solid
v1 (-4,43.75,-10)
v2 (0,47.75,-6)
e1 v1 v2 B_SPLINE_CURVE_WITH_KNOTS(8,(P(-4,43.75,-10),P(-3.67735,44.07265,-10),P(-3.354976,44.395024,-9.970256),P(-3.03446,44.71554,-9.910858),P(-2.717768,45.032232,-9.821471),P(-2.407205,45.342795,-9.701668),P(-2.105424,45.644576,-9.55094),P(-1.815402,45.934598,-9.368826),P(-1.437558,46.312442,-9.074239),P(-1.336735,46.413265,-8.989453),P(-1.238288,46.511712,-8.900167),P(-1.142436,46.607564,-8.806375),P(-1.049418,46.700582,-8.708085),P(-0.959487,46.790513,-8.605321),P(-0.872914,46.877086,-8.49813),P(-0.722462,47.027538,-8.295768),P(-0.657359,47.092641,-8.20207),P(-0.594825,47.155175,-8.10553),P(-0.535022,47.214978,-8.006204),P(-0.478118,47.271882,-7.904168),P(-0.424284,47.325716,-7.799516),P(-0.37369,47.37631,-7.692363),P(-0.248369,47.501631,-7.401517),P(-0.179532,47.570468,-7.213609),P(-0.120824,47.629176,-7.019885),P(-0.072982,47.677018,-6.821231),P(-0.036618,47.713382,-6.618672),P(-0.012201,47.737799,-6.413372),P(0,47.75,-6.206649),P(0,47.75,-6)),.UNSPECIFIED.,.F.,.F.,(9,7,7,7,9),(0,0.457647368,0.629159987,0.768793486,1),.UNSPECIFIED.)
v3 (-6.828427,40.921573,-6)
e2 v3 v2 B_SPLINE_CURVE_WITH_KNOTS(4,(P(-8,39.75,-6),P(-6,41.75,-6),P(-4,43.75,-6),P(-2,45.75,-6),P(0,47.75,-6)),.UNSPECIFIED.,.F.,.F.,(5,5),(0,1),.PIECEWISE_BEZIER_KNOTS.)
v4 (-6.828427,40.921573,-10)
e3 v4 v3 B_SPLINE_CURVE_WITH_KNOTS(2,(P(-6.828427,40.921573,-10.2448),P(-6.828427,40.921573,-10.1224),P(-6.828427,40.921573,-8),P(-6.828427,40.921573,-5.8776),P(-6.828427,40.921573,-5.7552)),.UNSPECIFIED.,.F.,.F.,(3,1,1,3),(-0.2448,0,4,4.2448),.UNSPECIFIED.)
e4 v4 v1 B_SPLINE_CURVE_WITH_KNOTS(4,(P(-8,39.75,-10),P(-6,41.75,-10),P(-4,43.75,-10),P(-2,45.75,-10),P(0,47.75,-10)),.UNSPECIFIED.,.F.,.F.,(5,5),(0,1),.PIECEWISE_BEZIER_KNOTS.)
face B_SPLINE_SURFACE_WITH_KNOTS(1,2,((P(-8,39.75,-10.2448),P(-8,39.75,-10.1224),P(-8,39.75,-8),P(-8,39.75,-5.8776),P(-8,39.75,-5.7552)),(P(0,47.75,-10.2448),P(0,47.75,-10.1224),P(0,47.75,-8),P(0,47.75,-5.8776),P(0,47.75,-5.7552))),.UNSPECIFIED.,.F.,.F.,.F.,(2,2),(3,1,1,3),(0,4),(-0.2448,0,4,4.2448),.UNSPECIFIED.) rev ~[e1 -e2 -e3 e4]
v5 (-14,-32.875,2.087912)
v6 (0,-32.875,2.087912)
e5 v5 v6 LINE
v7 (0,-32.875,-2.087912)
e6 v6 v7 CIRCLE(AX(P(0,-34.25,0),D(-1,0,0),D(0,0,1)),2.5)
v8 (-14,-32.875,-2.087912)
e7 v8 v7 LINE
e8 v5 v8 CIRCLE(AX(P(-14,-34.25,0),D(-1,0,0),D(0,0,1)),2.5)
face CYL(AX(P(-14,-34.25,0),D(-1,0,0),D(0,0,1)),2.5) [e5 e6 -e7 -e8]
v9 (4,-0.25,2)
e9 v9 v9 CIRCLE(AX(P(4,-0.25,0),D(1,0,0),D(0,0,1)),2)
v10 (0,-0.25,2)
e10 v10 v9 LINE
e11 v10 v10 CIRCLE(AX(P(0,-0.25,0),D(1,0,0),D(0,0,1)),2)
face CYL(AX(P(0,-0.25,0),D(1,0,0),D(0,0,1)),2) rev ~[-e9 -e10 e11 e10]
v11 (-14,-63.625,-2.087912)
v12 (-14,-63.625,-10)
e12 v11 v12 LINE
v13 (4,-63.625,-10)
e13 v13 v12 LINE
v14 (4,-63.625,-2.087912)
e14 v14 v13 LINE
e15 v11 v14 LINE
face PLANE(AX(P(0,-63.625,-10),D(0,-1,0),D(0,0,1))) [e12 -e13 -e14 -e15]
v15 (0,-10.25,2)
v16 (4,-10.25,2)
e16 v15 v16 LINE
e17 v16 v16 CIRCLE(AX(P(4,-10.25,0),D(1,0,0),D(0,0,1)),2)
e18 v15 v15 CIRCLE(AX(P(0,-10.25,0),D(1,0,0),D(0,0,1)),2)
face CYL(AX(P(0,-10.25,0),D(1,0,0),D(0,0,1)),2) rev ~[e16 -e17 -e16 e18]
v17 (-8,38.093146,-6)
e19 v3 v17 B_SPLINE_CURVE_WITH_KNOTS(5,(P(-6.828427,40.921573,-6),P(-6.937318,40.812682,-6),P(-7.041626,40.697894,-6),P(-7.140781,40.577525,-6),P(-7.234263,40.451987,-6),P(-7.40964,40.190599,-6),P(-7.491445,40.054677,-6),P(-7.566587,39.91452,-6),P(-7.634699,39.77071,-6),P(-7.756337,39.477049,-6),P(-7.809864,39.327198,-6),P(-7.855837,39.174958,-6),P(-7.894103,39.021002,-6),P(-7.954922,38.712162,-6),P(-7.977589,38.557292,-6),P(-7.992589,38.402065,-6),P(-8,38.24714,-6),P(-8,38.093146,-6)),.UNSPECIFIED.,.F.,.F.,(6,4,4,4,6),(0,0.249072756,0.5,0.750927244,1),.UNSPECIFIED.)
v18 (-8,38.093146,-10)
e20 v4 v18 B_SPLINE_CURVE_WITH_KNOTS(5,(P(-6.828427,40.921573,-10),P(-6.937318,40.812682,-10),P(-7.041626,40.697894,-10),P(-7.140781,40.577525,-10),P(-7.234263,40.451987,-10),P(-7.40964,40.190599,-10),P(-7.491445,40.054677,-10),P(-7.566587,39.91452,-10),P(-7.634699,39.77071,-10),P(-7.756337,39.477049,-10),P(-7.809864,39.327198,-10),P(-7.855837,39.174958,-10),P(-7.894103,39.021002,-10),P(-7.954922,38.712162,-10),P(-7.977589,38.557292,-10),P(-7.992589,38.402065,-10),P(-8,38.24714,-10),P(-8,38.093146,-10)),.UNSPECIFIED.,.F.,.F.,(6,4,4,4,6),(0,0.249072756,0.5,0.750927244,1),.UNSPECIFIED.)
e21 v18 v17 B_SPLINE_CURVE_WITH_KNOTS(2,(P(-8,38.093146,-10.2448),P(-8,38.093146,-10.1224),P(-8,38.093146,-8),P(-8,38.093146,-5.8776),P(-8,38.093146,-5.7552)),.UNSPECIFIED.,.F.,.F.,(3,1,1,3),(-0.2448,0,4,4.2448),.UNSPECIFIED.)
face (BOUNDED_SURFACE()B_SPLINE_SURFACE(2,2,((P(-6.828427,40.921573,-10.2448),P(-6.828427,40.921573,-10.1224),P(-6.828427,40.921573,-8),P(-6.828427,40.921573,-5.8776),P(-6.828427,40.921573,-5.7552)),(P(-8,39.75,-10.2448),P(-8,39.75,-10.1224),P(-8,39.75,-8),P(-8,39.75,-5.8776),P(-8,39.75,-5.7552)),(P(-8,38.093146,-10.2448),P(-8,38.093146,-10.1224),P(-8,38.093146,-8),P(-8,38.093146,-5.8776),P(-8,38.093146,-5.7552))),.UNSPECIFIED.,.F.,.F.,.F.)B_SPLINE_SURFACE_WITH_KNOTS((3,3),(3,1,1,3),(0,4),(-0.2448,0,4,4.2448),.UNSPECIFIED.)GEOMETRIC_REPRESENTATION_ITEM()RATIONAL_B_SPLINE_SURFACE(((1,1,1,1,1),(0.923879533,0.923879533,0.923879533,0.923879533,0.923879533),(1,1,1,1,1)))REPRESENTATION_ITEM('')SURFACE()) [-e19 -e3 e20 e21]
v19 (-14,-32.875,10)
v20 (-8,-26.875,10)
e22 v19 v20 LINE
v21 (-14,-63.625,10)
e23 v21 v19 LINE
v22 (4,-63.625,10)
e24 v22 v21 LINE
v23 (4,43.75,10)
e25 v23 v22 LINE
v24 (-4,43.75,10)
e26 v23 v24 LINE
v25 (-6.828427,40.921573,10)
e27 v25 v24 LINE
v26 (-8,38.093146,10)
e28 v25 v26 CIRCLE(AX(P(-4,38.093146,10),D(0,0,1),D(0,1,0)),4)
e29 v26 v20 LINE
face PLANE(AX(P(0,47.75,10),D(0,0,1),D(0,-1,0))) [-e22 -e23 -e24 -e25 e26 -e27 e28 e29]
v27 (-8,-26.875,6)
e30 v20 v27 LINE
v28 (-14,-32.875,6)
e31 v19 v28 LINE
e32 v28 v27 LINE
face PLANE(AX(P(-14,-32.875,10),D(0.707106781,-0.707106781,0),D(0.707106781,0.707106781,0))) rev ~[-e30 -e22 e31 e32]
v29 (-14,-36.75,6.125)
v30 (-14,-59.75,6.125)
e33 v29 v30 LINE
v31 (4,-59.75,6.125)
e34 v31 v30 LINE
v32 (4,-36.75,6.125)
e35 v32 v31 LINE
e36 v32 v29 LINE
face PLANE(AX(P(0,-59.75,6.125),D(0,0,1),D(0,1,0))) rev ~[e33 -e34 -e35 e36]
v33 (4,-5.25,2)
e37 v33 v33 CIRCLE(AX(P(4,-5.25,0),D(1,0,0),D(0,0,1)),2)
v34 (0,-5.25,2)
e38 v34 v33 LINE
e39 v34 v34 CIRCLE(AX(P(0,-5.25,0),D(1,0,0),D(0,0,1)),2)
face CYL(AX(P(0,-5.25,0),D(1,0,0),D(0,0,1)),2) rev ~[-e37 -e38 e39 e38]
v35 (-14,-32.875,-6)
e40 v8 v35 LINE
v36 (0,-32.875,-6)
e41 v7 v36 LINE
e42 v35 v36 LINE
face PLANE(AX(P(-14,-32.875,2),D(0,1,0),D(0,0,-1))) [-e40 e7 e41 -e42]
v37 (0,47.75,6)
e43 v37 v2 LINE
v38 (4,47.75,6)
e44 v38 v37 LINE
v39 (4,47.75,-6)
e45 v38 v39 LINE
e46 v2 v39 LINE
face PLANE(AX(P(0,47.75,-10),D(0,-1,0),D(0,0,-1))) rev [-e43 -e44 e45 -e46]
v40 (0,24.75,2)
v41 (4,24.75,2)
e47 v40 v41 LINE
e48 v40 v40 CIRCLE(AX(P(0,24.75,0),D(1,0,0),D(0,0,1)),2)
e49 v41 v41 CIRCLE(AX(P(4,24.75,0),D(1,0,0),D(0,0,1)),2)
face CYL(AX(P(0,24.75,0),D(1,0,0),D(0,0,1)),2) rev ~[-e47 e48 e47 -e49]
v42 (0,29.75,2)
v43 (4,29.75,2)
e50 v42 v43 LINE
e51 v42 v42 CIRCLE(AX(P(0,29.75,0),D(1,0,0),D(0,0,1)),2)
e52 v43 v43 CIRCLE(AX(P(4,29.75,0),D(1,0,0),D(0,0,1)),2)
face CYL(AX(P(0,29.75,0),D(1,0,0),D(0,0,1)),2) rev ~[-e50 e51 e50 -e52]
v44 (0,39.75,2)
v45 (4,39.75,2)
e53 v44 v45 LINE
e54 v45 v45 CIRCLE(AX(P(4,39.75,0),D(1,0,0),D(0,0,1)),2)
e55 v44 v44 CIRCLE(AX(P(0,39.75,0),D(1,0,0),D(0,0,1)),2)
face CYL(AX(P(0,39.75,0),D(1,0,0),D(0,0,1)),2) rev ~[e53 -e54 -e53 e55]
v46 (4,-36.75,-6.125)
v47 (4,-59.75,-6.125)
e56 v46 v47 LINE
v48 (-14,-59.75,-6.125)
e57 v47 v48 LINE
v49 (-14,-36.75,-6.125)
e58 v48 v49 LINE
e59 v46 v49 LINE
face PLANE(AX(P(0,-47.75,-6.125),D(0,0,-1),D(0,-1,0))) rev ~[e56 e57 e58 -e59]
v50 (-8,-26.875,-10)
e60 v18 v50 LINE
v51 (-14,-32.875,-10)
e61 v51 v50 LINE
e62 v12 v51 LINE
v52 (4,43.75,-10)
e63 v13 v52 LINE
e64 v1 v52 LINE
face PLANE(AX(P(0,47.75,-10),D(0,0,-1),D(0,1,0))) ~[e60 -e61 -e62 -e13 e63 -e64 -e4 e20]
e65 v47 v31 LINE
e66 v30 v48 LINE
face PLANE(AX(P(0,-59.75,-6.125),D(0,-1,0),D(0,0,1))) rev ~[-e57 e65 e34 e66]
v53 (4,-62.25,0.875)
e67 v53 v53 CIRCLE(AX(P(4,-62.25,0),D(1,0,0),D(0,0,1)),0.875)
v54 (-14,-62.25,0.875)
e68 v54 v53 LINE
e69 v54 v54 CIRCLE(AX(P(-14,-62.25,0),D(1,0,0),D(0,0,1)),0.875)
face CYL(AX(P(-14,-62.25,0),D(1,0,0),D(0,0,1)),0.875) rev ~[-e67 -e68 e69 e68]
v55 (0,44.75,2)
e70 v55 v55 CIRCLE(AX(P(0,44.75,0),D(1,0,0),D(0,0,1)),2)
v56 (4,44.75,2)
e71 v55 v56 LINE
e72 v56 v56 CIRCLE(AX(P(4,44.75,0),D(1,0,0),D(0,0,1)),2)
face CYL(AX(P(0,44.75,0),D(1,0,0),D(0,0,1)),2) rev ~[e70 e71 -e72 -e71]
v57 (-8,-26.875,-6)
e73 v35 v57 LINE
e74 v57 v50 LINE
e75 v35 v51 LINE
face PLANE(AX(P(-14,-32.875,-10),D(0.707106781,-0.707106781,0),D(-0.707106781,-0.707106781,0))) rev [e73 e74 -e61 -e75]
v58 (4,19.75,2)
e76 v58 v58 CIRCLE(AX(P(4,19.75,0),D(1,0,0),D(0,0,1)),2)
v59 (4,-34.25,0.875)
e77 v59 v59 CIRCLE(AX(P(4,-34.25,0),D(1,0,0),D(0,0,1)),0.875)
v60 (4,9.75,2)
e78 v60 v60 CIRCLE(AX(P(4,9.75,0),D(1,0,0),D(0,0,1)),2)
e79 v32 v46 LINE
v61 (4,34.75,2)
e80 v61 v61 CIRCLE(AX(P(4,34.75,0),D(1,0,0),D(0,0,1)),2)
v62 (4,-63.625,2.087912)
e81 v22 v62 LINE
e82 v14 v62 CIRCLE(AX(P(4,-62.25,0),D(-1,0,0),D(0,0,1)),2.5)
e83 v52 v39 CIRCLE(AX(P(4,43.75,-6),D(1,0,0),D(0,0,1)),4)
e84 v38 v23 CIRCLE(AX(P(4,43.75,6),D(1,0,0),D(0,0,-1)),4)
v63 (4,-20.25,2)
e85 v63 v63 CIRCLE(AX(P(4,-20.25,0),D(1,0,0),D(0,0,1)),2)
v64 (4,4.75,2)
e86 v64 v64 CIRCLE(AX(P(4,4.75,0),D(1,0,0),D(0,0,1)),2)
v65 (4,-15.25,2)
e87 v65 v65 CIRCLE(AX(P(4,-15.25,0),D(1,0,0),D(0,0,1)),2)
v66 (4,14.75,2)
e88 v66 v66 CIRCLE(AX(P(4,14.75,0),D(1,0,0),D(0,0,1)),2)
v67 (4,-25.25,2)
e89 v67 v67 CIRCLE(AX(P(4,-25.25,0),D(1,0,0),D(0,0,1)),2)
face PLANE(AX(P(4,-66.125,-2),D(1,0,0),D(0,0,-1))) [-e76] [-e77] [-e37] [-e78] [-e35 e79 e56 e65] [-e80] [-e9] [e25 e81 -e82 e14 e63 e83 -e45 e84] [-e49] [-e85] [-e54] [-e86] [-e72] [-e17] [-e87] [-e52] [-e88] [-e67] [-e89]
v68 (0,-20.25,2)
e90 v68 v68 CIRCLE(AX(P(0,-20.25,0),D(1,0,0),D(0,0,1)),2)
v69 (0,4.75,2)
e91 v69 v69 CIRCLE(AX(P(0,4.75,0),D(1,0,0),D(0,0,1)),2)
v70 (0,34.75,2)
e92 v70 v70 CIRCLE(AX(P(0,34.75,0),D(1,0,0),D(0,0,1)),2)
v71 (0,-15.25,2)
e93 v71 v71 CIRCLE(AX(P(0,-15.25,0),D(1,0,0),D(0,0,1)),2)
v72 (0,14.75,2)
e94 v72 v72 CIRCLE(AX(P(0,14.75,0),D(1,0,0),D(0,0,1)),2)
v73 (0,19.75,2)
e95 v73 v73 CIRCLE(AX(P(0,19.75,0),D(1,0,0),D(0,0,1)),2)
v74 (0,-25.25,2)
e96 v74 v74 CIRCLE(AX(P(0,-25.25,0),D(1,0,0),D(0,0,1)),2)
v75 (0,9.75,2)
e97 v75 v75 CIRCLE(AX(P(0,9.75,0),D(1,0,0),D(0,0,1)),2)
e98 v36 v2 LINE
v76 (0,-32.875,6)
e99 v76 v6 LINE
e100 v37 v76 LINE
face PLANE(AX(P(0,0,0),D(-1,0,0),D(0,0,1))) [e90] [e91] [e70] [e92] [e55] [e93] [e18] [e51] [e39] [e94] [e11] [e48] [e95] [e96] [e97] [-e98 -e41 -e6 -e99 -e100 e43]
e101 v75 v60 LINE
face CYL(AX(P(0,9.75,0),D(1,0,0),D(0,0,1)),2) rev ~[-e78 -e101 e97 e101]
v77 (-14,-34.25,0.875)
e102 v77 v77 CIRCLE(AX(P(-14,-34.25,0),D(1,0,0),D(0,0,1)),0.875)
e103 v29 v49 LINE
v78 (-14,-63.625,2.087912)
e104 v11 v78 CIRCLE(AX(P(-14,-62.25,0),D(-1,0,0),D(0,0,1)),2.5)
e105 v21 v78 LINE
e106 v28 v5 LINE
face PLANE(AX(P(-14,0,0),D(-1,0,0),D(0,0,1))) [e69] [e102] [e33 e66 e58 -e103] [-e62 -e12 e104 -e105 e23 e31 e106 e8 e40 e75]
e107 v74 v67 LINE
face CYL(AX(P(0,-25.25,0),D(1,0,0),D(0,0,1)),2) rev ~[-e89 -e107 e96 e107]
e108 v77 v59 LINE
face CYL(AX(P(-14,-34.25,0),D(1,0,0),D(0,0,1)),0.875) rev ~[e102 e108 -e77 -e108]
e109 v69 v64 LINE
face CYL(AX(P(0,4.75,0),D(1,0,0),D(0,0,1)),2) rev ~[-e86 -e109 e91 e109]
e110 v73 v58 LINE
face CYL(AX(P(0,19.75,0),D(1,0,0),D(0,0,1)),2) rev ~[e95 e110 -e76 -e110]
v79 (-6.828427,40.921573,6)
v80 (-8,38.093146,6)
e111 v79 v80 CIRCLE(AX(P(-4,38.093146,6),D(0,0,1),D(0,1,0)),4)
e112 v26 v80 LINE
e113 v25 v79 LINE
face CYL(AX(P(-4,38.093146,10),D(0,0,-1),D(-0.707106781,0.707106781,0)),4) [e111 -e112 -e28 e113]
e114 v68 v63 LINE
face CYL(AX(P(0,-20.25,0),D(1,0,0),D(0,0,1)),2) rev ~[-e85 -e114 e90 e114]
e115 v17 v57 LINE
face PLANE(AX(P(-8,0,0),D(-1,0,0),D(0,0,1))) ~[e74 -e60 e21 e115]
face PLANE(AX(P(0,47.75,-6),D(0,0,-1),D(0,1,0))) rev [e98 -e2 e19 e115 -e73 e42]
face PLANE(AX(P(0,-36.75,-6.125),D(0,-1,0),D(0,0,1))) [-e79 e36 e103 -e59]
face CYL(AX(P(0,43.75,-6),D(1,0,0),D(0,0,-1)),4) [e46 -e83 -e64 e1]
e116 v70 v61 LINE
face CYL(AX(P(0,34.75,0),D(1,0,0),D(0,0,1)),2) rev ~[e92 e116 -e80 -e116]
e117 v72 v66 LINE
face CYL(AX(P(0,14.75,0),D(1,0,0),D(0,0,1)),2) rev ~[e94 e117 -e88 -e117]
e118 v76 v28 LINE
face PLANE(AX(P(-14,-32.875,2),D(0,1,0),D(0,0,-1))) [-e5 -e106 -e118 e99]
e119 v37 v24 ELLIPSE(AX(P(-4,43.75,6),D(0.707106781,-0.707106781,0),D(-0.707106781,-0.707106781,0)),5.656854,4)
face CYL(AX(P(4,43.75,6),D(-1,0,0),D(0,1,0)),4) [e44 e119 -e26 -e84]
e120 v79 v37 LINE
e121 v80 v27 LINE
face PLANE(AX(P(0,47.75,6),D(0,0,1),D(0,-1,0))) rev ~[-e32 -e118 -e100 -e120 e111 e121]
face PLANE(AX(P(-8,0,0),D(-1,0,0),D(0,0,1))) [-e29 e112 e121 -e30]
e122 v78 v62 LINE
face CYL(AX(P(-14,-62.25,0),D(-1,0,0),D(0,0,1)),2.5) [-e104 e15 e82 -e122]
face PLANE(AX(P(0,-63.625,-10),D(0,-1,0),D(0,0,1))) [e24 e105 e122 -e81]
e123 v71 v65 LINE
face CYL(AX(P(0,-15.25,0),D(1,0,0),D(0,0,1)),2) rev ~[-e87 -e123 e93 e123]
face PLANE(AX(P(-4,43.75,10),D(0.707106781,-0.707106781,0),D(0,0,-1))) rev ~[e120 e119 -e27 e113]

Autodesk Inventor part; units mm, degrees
ref_plane "YZ Plane" through (0, 0, 0) normal (1, 0, 0) x (0, 1, 0)
ref_plane "XZ Plane" through (0, 0, 0) normal (0, 1, 0) x (-1, 0, 0)
ref_plane "XY Plane" through (0, 0, 0) normal (0, 0, 1) x (1, 0, 0)
sketch "Sketch1" plane through (0, 0, 0) normal (1, 0, 0) x (0, 1, 0)
  line L0 (47.75, -10) -> (-47.75, -10)
  line L1 (-47.75, -10) -> (-47.75, 10)
  line L2 (-47.75, 10) -> (47.75, 10)
  line L3 (47.75, 10) -> (47.75, -10)
  line L4 (47.75, -10) -> (-47.75, 10) construction
  line L5 (-47.75, -10) -> (47.75, 10) construction
  circle A0 centre (40.75, 0) radius 2
  circle A1 centre (-4.25, 0) radius 2
  line L6 (18.25, 25.1028) -> (18.25, -34.7635) construction
  line L7 (-1.75, 23.8417) -> (-1.75, -36.7999) construction
  circle A2 centre (20.75, 0) radius 2
  circle A3 centre (-24.25, 0) radius 2
  line L8 (-41.75, 23.8417) -> (-41.75, -30.9921) construction
  circle A4 centre (34.0833, 0) radius 2
  circle A5 centre (27.4167, 0) radius 2
  circle A6 centre (-10.9167, 0) radius 2
  circle A7 centre (-17.5833, 0) radius 2
  point P0 (0, 0)
  dimension "d1" = 20
  dimension "d4" = 4
  dimension "d5" = 7
  dimension "d6" = 45
  dimension "d7" = 22.5
  dimension "d8" = 20
  dimension "d9" = 22.5
  dimension "d10" = 22.5
  dimension "d11" = 60
  dimension "d18" = 6.6667
  dimension "d25" = 6.6667
  dimension "d30" = 6
extrude "Extrusion1" add sketch "Sketch1" along normal blind 4
sketch "Sketch2" plane through (0, 0, 0) normal (1, 0, 0) x (0, 1, 0)
  line L0 (-41.75, 22.3574) -> (-41.75, -36.9148) construction
  circle A0 centre (-17.5833, 0) radius 2 projected
  circle A1 centre (-10.9167, 0) radius 2 projected
  circle A2 centre (27.4167, 0) radius 2 projected
  circle A3 centre (34.0833, 0) radius 2 projected
  circle A4 centre (-24.25, 0) radius 2 projected
  circle A5 centre (20.75, 0) radius 2 projected
  circle A6 centre (-4.25, 0) radius 2 projected
  circle A7 centre (40.75, 0) radius 2 projected
  line L1 (-47.75, -10) -> (47.75, -10) projected
  line L2 (47.75, -10) -> (47.75, 10) projected
  line L3 (47.75, 10) -> (-47.75, 10) projected
  line L4 (-47.75, 10) -> (-47.75, -10) projected
  line L5 (47.75, 0) -> (-47.75, 0) construction
  line L6 (-47.75, -10) -> (-47.75, 10) projected
  line L7 (-59.75, -6.125) -> (-36.75, -6.125)
  line L8 (-36.75, -6.125) -> (-36.75, 6.125)
  line L9 (-36.75, 6.125) -> (-59.75, 6.125)
  line L10 (-59.75, 6.125) -> (-59.75, -6.125)
  line L11 (-59.75, -6.125) -> (-36.75, 6.125) construction
  line L12 (-36.75, -6.125) -> (-59.75, 6.125) construction
  line L13 (-47.75, -10) -> (-63.625, -10)
  line L14 (-63.625, -10) -> (-63.625, 10)
  line L15 (-63.625, 10) -> (-47.75, 10)
  line L16 (-47.75, 10) -> (-47.75, -10)
  line L17 (-32.875, -10) -> (-32.875, 10)
  point P0 (0, 0)
  point P1 (-48.25, 0)
  dimension "d33" = 6
  dimension "d34" = 12.25
  dimension "d35" = 23
  dimension "d36" = 5
  dimension "d37" = 3.875
  dimension "d38" = 3.875
  dimension "d39" = 3.875
extrude "Extrusion2" cut sketch "Sketch2" along normal blind 20 contours L7 L10 L9 L4 | L4 L9 L8 L7
sketch "Sketch3" plane through (0, 0, 0) normal (-1, 0, 0) x (0, 0, 1)
  line L0 (-10, -47.75) -> (-6.125, -47.75) projected
  line L1 (-10, -47.75) -> (-6.125, -47.75)
  line L2 (6.125, -47.75) -> (10, -47.75) projected
  line L3 (10, -47.75) -> (6.125, -47.75)
  line L4 (6.125, -36.75) -> (6.125, -47.75) projected
  line L5 (6.125, -47.75) -> (10, -47.75) projected
  line L6 (10, -47.75) -> (10, 47.75) projected
  line L7 (10, 47.75) -> (-10, 47.75) projected
  line L8 (-10, 47.75) -> (-10, -47.75) projected
  line L9 (-10, -47.75) -> (-6.125, -47.75) projected
  line L10 (-6.125, -47.75) -> (-6.125, -36.75) projected
  line L11 (-6.125, -36.75) -> (6.125, -36.75) projected
  circle A0 centre (0, -17.5833) radius 2 projected
  circle A1 centre (0, -10.9167) radius 2 projected
  circle A2 centre (0, 27.4167) radius 2 projected
  circle A3 centre (0, 34.0833) radius 2 projected
  circle A4 centre (0, -24.25) radius 2 projected
  circle A5 centre (0, 20.75) radius 2 projected
  circle A6 centre (0, -4.25) radius 2 projected
  circle A7 centre (0, 40.75) radius 2 projected
  line L12 (-6.125, -36.75) -> (6.125, -36.75)
  line L13 (6.125, -36.75) -> (6.125, -59.75)
  line L14 (6.125, -59.75) -> (-6.125, -59.75)
  line L15 (-6.125, -59.75) -> (-6.125, -36.75)
  line L16 (-10, 47.75) -> (-10, -47.75) projected
  line L17 (-10, -32.875) -> (10, -32.875)
  line L18 (10, -32.875) -> (10, -63.625)
  line L19 (10, -63.625) -> (-10, -63.625)
  line L20 (-10, -63.625) -> (-10, -32.875)
  point P0 (0, 0)
  dimension "d44" = 23
  dimension "d45" = 3.875
  dimension "d46" = 3.875
  dimension "d47" = 3.875
extrude "Extrusion4" add sketch "Sketch3" along normal blind 20 contours L8 L17 L6 L2 L4 L11 L10 L0 | L0 L15 L14 L13 L2 L18 L19 L20
sketch "Sketch5" plane through (0, 0, 0) normal (1, 0, 0) x (0, 0, -1)
  line L0 (-6.125, -47.75) -> (-10, -47.75) projected
  line L1 (-10, -63.625) -> (-10, -47.75) projected
  line L2 (10, -63.625) -> (-10, -63.625) projected
  line L3 (10, -47.75) -> (10, -63.625) projected
  line L4 (10, -47.75) -> (6.125, -47.75) projected
  line L5 (6.125, -47.75) -> (6.125, -59.75) projected
  line L6 (6.125, -59.75) -> (-6.125, -59.75) projected
  line L7 (-6.125, -59.75) -> (-6.125, -47.75) projected
  point P0 (0, 0)
extrude "Extrusion5" add sketch "Sketch5" along normal blind 4
sketch "Sketch6" plane through (0, 0, 0) normal (-1, 0, 0) x (0, 0, 1)
  line L0 (-10, -32.875) -> (10, -32.875) projected
  line L1 (10, -32.875) -> (10, 47.75) projected
  line L2 (10, 47.75) -> (-10, 47.75) projected
  line L3 (-10, 47.75) -> (-10, -32.875) projected
  circle A0 centre (0, -17.5833) radius 2 projected
  circle A1 centre (0, -10.9167) radius 2 projected
  circle A2 centre (0, 27.4167) radius 2 projected
  circle A3 centre (0, 34.0833) radius 2 projected
  circle A4 centre (0, -24.25) radius 2 projected
  circle A5 centre (0, 20.75) radius 2 projected
  circle A6 centre (0, -4.25) radius 2 projected
  circle A7 centre (0, 40.75) radius 2 projected
  circle A8 centre (0, -30.375) radius 0.875
  point P0 (0, 0)
  dimension "d52" = 2.5
  dimension "d53" = 1.75
extrude "Extrusion6" cut sketch "Sketch6" against normal blind 4 contours A8
sketch "Sketch8" plane through (4, 47.75, -10) normal (0, 0, -1) x (-1, 0, 0)
  line L0 (24, -84.5) -> (0, -84.5) projected
  line L1 (4, 0) -> (4, -80.625) projected
  line L2 (4, 0) -> (0, 0) projected
  line L3 (0, -111.375) -> (0, 0) projected
  line L4 (0, -111.375) -> (24, -111.375) projected
  line L5 (24, -80.625) -> (24, -111.375) projected
  line L6 (4, -80.625) -> (24, -80.625) projected
  line L7 (4, -80.625) -> (4, 0) projected
  line L8 (4, 0) -> (4, -80.625) projected
  line L9 (24, -80.625) -> (4, 0)
  point P0 (4, -47.75)
extrude "Extrusion8" add sketch "Sketch8" against normal blind 3 contours L6 L1 L9
mirror "Mirror2" about plane through (0, 0, 0) normal (0, 0, 1) of "Extrusion8"
sketch "Sketch9" plane through (4, 0, 0) normal (1, 0, 0) x (0, 0, -1)
  circle A0 centre (0, -30.375) radius 0.875 projected
  line L0 (10, -63.625) -> (10, 47.75) projected
  line L1 (10, 47.75) -> (-10, 47.75) projected
  line L2 (-10, 47.75) -> (-10, -63.625) projected
  line L3 (-10, -63.625) -> (10, -63.625) projected
  line L4 (6.125, -36.75) -> (6.125, -59.75) projected
  line L5 (6.125, -59.75) -> (-6.125, -59.75) projected
  line L6 (-6.125, -59.75) -> (-6.125, -36.75) projected
  line L7 (-6.125, -36.75) -> (6.125, -36.75) projected
  circle A1 centre (0, 40.75) radius 2 projected
  circle A2 centre (0, -4.25) radius 2 projected
  circle A3 centre (0, 20.75) radius 2 projected
  circle A4 centre (0, -24.25) radius 2 projected
  circle A5 centre (0, 34.0833) radius 2 projected
  circle A6 centre (0, 27.4167) radius 2 projected
  circle A7 centre (0, -10.9167) radius 2 projected
  circle A8 centre (0, -17.5833) radius 2 projected
  point P0 (0, 0)
sketch "Sketch10" plane through (0, 0, 0) normal (-1, 0, 0) x (0, 0, 1)
  line L0 (-3.7215, 44.8818) -> (4.317, 44.8818)
  line L1 (4.317, 44.8818) -> (4.317, -27.7627)
  line L2 (4.317, -27.7627) -> (-3.7215, -27.7627)
  line L3 (-3.7215, -27.7627) -> (-3.7215, 44.8818)
  point P0 (0, 0)
extrude "Extrusion9" add sketch "Sketch10" against normal blind 4
sketch "Sketch11" plane through (0, 0, 0) normal (-1, 0, 0) x (0, 0, 1)
  circle A0 centre (0, -30.375) radius 0.875 projected
  line L0 (7, -32.875) -> (7, 47.75) projected
  line L1 (7, 47.75) -> (-7, 47.75) projected
  line L2 (-7, 47.75) -> (-7, -32.875) projected
  line L3 (-7, -32.875) -> (7, -32.875) projected
  arc A1 (2, -30.375) -> (-2, -30.375) centre (0, -30.375) ccw
  line L4 (-7, -32.875) -> (7, -32.875) projected
  line L5 (-0.875, -30.375) -> (0.875, -30.375)
  line L6 (2, -30.375) -> (2, -32.875)
  line L7 (2, -32.875) -> (-2, -32.875)
  line L8 (-2, -32.875) -> (-2, -30.375)
  point P0 (0, 0)
  point P1 (-2, -32.875)
  dimension "d68" = 4
extrude "Extrusion10" add sketch "Sketch11" along normal blind 20 contours L3 L8 A1 L6
sketch "Sketch12" plane through (0, 0, 0) normal (-1, 0, 0) x (0, 0, 1)
  line L0 (7, 47.75) -> (-7, 47.75) projected
  line L1 (2, -30.375) -> (2, -32.875) projected
  line L2 (2, -32.875) -> (7, -32.875) projected
  line L3 (7, -32.875) -> (7, 47.75) projected
  line L4 (7, 47.75) -> (-7, 47.75) projected
  line L5 (-7, 47.75) -> (-7, -32.875) projected
  line L6 (-7, -32.875) -> (-2, -32.875) projected
  line L7 (-2, -32.875) -> (-2, -30.375) projected
  arc A0 (2, -30.375) -> (-2, -30.375) centre (0, -30.375) ccw projected
  point P0 (0, 0)
  point P1 (0, 44.75)
  point P2 (0, 39.75)
  point P3 (0, 34.75)
  point P4 (0, 29.75)
  point P5 (0, 24.75)
  point P6 (0, 19.75)
  point P7 (0, 14.75)
  point P8 (0, 9.75)
  point P9 (0, 4.75)
  point P10 (0, -0.25)
  point P11 (0, -5.25)
  point P12 (0, -10.25)
  point P13 (0, -15.25)
  point P14 (0, -20.25)
  point P15 (0, -25.25)
  dimension "d71" = 3
  dimension "d74" = 5
hole "Hole1" at (0, 44.75, 0) at (0, 39.75, 0) at (0, 34.75, 0) at (0, 29.75, 0) at (0, 24.75, 0) at (0, 19.75, 0) at (0, 14.75, 0) at (0, 9.75, 0) at (0, 4.75, 0) at (0, -0.25, 0) at (0, -5.25, 0) at (0, -10.25, 0) at (0, -15.25, 0) at (0, -20.25, 0) at (0, -25.25, 0) direction (1, 0, 0) diameter 4 end through all
sketch "Sketch13" plane through (-20, 0, 0) normal (-1, 0, 0) x (0, 0, 1)
  line L0 (-19.5017, -86.8207) -> (19.9399, -86.8207)
  line L1 (19.9399, -86.8207) -> (19.9399, 61.3045)
  line L2 (19.9399, 61.3045) -> (-19.5017, 61.3045)
  line L3 (-19.5017, 61.3045) -> (-19.5017, -86.8207)
  point P0 (0, 0)
extrude "Extrusion11" cut sketch "Sketch13" against normal blind 6
sketch "Sketch14" plane through (-14, 0, 0) normal (-1, 0, 0) x (0, 0, 1)
  line L0 (6.125, -59.75) -> (6.125, -36.75) projected
  line L1 (6.125, -59.75) -> (6.125, -36.75) projected
  line L2 (6.125, -48.25) -> (-6.125, -48.25)
  line L3 (-6.125, -36.75) -> (-6.125, -59.75) projected
  point P0 (0, 0)
surface extrude "ExtrusionSrf1" sketch "Sketch14" against normal mid plane 50 shown no curves L2
mirror "Mirror3" about plane through (-14, -48.25, 6.125) normal (0, -1, 0) of "Extrusion10"
sketch "Sketch15" plane through (-20, -66.125, -2) normal (-1, 0, 0) x (0, 0, 1)
  circle A0 centre (2, 0) radius 0.875 projected
  line L0 (0, 0) -> (0, 2.5) projected
  arc A1 (0, 0) -> (4, 0) centre (2, 0) ccw projected
  line L1 (4, 2.5) -> (4, 0) projected
  line L2 (0, 2.5) -> (4, 2.5) projected
  circle A2 centre (2, 0) radius 0.875 projected
  point P0 (2, 66.125)
extrude "Extrusion12" cut sketch "Sketch15" against normal up to surface (6 mm away) contours A0 | L0 L2 L1 A1
sketch "Sketch16" plane through (0, -66.125, -2) normal (1, 0, 0) x (0, 0, -1)
  line L0 (0, 0) -> (0, 2.5) projected
  line L1 (-4, 2.5) -> (0, 2.5) projected
  line L2 (-4, 2.5) -> (-4, 0) projected
  arc A0 (-4, 0) -> (0, 0) centre (-2, 0) ccw projected
  circle A1 centre (-2, 0) radius 0.875 projected
  point P0 (-2, 66.125)
extrude "Extrusion13" add sketch "Sketch16" along normal up to surface (4 mm away)
chamfer "Chamfer1" distance 16 angle 45 2 edges at (-14, -8.6875, -8.5) (-14, -8.6875, 8.5)
sketch "Sketch17" plane through (-14, 0, 0) normal (-1, 0, 0) x (0, 0, 1)
  circle A0 centre (0, -66.125) radius 0.875 projected
  circle A1 centre (0, -30.375) radius 0.875 projected
  line L0 (7, -24.6875) -> (10, -24.6875) projected
  line L1 (7, -32.875) -> (7, -24.6875) projected
  line L2 (2, -32.875) -> (7, -32.875) projected
  line L3 (2, -30.375) -> (2, -32.875) projected
  arc A2 (2, -30.375) -> (-2, -30.375) centre (0, -30.375) ccw projected
  line L4 (-2, -32.875) -> (-2, -30.375) projected
  line L5 (-7, -32.875) -> (-2, -32.875) projected
  line L6 (-7, -24.6875) -> (-7, -32.875) projected
  line L7 (-10, -24.6875) -> (-7, -24.6875) projected
  line L8 (-10, -63.625) -> (-10, -24.6875) projected
  line L9 (-2, -63.625) -> (-10, -63.625) projected
  line L10 (-2, -66.125) -> (-2, -63.625) projected
  arc A3 (-2, -66.125) -> (2, -66.125) centre (0, -66.125) ccw projected
  line L11 (2, -63.625) -> (2, -66.125) projected
  line L12 (10, -63.625) -> (2, -63.625) projected
  line L13 (10, -24.6875) -> (10, -63.625) projected
  line L14 (6.125, -36.75) -> (-6.125, -36.75) projected
  line L15 (6.125, -59.75) -> (6.125, -36.75) projected
  line L16 (-6.125, -59.75) -> (6.125, -59.75) projected
  line L17 (-6.125, -36.75) -> (-6.125, -59.75) projected
  line L18 (-7, -24.6875) -> (-7, -32.875) projected
  line L19 (-7, -32.875) -> (-26.1953, -32.875)
  line L20 (-26.1953, -32.875) -> (-26.1953, 59.8507)
  line L21 (-26.1953, 59.8507) -> (-7, 59.8507)
  line L22 (-7, 59.8507) -> (-7, -32.875)
  line L23 (2, -32.875) -> (7, -32.875) projected
  line L24 (7, -32.875) -> (27.7212, -32.875)
  line L25 (27.7212, -32.875) -> (27.7212, 59.8507)
  line L26 (27.7212, 59.8507) -> (7, 59.8507)
  line L27 (7, 59.8507) -> (7, -32.875)
  point P0 (0, 0)
extrude "Extrusion14" cut sketch "Sketch17" against normal up to surface (14 mm away) contours L27 L26 L25 L24 L13 L0 | L0 L13 L24 L1 | L19 L8 L7 L6 | L7 L8 L19 L20 L21 L22
sketch "Sketch18" plane through (0, 47.75, 10) normal (0, 0, 1) x (1, 0, 0)
  line L0 (0, 0) -> (0, -80.625) projected
  line L1 (0, -80.625) -> (-14, -80.625) projected
  line L2 (-14, -80.625) -> (-14, -111.375) projected
  line L3 (4, -111.375) -> (-14, -111.375) projected
  line L4 (4, 0) -> (4, -111.375) projected
  line L5 (0, 0) -> (4, 0) projected
  line L6 (-14, -80.625) -> (0, -80.625) projected
  line L7 (-14, -80.625) -> (0, -66.625)
  point P0 (0, -47.75)
  dimension "d101" = 45
extrude "Extrusion15" add sketch "Sketch18" against normal blind 4 contours L0 L1 L7
sketch "Sketch19" plane through (0, 0, 0) normal (-1, 0, 0) x (0, 0, 1)
  line L0 (10, 47.75) -> (10, -63.625) projected
  line L1 (6, -32.875) -> (2, -32.875) projected
  line L2 (10, 47.75) -> (6, 47.75)
  line L3 (6, 47.75) -> (6, -32.875)
  line L4 (6, -32.875) -> (10, -32.875)
  line L5 (10, -32.875) -> (10, 47.75)
  point P0 (0, 0)
extrude "Extrusion16" add sketch "Sketch19" along normal blind 8
chamfer "Chamfer2" distance 8 angle 45 1 edges at (-8, 47.75, 8)
mirror "Mirror4" about plane through (0, 0, 0) normal (0, 0, 1) of "Extrusion15", "Extrusion16", "Chamfer2"
fillet "Fillet4" radius 4 2 edges at (2, 47.75, 10) (2, 47.75, -10)
fillet "Fillet5" radius 4 2 edges at (-8, 39.75, -8) (-8, 39.75, 8)
sketch "Sketch20" plane through (-14, 0, 0) normal (-1, 0, 0) x (0, 0, 1)
  line L0 (6.125, -36.75) -> (-6.125, -36.75) projected
  line L1 (-6.125, -59.75) -> (6.125, -59.75) projected
  point P0 (0, 0)
  point P1 (0, -34.25)
  point P2 (0, -62.25)
  dimension "d111" = 2.5
  dimension "d112" = 2.5
hole "Hole2" at (-14, -34.25, 0) at (-14, -62.25, 0) direction (1, 0, 0) diameter 1.75 end through all
sketch "Sketch21" plane through (-14, 0, 0) normal (-1, 0, 0) x (0, 0, 1)
  circle A0 centre (0, -34.25) radius 0.875 projected
  circle A1 centre (0, -62.25) radius 0.875 projected
  line L0 (10, -32.875) -> (6, -32.875) projected
  line L1 (6, -32.875) -> (2, -32.875) projected
  line L2 (2, -30.375) -> (2, -32.875) projected
  arc A2 (2, -30.375) -> (-2, -30.375) centre (0, -30.375) ccw projected
  line L3 (-2, -32.875) -> (-2, -30.375) projected
  line L4 (-2, -32.875) -> (-6, -32.875) projected
  line L5 (-6, -32.875) -> (-10, -32.875) projected
  line L6 (-10, -63.625) -> (-10, -32.875) projected
  line L7 (-2, -63.625) -> (-10, -63.625) projected
  line L8 (-2, -66.125) -> (-2, -63.625) projected
  arc A3 (-2, -66.125) -> (2, -66.125) centre (0, -66.125) ccw projected
  line L9 (2, -63.625) -> (2, -66.125) projected
  line L10 (10, -63.625) -> (2, -63.625) projected
  line L11 (10, -32.875) -> (10, -63.625) projected
  line L12 (6.125, -36.75) -> (-6.125, -36.75) projected
  line L13 (6.125, -59.75) -> (6.125, -36.75) projected
  line L14 (-6.125, -59.75) -> (6.125, -59.75) projected
  line L15 (-6.125, -36.75) -> (-6.125, -59.75) projected
  circle A4 centre (0, -30.375) radius 0.875 projected
  circle A5 centre (0, -66.125) radius 0.875 projected
  line L16 (-2, -63.625) -> (2, -63.625)
  line L17 (6, -32.875) -> (2, -32.875) projected
  line L18 (2, -32.875) -> (-2, -32.875)
  point P0 (0, 0)
extrude "Extrusion17" cut sketch "Sketch21" against normal up to surface (14 mm away) contours L18 L3 A2 L2 | L9 A3 L8 L16
sketch "Sketch22" plane through (0, -66.125, -2) normal (-1, 0, 0) x (0, 0, 1)
  circle A0 centre (2, 0) radius 0.875 projected
  line L0 (4, 2.5) -> (0, 2.5) projected
  line L1 (0, 0) -> (0, 2.5) projected
  arc A1 (0, 0) -> (4, 0) centre (2, 0) ccw projected
  line L2 (4, 2.5) -> (4, 0) projected
  point P0 (2, 66.125)
extrude "Extrusion18" cut sketch "Sketch22" against normal blind 10 contours A0 | L2 A1 L1 L0
sketch "Sketch23" plane through (0, 0, 0) normal (-1, 0, 0) x (0, 0, 1)
  circle A0 centre (0, -30.375) radius 0.875 projected
  point P0 (0, 0)
extrude "Extrusion19" add sketch "Sketch23" against normal blind 4
sketch "Sketch24" plane through (-14, 0, 0) normal (-1, 0, 0) x (0, 0, 1)
  line L0 (10, -63.625) -> (-10, -63.625) projected
  line L1 (10, -32.875) -> (10, -63.625) projected
  line L2 (10, -32.875) -> (6, -32.875) projected
  line L3 (6, -32.875) -> (-6, -32.875) projected
  line L4 (-6, -32.875) -> (-10, -32.875) projected
  line L5 (-10, -63.625) -> (-10, -32.875) projected
  circle A0 centre (0, -34.25) radius 0.875 projected
  circle A1 centre (0, -62.25) radius 0.875 projected
  line L6 (6.125, -36.75) -> (-6.125, -36.75) projected
  line L7 (6.125, -59.75) -> (6.125, -36.75) projected
  line L8 (-6.125, -59.75) -> (6.125, -59.75) projected
  line L9 (-6.125, -36.75) -> (-6.125, -59.75) projected
  circle A2 centre (0, -34.25) radius 0.875 projected
  circle A3 centre (0, -34.25) radius 2.5
  circle A4 centre (0, -62.25) radius 2.5
  point P0 (0, 0)
  point P1 (-2.0879, -32.875)
  point P2 (2.0879, -32.875)
  point P3 (-2.0879, -63.625)
  point P4 (2.0879, -63.625)
extrude "Extrusion20" add sketch "Sketch24" against normal up to surface (18 mm away) contours A4 L0 | L3 A3 picked at (-0.2038, -63.9747) picked at (-0.2038, -32.2127)
properties part number "TopRearLeg3"
